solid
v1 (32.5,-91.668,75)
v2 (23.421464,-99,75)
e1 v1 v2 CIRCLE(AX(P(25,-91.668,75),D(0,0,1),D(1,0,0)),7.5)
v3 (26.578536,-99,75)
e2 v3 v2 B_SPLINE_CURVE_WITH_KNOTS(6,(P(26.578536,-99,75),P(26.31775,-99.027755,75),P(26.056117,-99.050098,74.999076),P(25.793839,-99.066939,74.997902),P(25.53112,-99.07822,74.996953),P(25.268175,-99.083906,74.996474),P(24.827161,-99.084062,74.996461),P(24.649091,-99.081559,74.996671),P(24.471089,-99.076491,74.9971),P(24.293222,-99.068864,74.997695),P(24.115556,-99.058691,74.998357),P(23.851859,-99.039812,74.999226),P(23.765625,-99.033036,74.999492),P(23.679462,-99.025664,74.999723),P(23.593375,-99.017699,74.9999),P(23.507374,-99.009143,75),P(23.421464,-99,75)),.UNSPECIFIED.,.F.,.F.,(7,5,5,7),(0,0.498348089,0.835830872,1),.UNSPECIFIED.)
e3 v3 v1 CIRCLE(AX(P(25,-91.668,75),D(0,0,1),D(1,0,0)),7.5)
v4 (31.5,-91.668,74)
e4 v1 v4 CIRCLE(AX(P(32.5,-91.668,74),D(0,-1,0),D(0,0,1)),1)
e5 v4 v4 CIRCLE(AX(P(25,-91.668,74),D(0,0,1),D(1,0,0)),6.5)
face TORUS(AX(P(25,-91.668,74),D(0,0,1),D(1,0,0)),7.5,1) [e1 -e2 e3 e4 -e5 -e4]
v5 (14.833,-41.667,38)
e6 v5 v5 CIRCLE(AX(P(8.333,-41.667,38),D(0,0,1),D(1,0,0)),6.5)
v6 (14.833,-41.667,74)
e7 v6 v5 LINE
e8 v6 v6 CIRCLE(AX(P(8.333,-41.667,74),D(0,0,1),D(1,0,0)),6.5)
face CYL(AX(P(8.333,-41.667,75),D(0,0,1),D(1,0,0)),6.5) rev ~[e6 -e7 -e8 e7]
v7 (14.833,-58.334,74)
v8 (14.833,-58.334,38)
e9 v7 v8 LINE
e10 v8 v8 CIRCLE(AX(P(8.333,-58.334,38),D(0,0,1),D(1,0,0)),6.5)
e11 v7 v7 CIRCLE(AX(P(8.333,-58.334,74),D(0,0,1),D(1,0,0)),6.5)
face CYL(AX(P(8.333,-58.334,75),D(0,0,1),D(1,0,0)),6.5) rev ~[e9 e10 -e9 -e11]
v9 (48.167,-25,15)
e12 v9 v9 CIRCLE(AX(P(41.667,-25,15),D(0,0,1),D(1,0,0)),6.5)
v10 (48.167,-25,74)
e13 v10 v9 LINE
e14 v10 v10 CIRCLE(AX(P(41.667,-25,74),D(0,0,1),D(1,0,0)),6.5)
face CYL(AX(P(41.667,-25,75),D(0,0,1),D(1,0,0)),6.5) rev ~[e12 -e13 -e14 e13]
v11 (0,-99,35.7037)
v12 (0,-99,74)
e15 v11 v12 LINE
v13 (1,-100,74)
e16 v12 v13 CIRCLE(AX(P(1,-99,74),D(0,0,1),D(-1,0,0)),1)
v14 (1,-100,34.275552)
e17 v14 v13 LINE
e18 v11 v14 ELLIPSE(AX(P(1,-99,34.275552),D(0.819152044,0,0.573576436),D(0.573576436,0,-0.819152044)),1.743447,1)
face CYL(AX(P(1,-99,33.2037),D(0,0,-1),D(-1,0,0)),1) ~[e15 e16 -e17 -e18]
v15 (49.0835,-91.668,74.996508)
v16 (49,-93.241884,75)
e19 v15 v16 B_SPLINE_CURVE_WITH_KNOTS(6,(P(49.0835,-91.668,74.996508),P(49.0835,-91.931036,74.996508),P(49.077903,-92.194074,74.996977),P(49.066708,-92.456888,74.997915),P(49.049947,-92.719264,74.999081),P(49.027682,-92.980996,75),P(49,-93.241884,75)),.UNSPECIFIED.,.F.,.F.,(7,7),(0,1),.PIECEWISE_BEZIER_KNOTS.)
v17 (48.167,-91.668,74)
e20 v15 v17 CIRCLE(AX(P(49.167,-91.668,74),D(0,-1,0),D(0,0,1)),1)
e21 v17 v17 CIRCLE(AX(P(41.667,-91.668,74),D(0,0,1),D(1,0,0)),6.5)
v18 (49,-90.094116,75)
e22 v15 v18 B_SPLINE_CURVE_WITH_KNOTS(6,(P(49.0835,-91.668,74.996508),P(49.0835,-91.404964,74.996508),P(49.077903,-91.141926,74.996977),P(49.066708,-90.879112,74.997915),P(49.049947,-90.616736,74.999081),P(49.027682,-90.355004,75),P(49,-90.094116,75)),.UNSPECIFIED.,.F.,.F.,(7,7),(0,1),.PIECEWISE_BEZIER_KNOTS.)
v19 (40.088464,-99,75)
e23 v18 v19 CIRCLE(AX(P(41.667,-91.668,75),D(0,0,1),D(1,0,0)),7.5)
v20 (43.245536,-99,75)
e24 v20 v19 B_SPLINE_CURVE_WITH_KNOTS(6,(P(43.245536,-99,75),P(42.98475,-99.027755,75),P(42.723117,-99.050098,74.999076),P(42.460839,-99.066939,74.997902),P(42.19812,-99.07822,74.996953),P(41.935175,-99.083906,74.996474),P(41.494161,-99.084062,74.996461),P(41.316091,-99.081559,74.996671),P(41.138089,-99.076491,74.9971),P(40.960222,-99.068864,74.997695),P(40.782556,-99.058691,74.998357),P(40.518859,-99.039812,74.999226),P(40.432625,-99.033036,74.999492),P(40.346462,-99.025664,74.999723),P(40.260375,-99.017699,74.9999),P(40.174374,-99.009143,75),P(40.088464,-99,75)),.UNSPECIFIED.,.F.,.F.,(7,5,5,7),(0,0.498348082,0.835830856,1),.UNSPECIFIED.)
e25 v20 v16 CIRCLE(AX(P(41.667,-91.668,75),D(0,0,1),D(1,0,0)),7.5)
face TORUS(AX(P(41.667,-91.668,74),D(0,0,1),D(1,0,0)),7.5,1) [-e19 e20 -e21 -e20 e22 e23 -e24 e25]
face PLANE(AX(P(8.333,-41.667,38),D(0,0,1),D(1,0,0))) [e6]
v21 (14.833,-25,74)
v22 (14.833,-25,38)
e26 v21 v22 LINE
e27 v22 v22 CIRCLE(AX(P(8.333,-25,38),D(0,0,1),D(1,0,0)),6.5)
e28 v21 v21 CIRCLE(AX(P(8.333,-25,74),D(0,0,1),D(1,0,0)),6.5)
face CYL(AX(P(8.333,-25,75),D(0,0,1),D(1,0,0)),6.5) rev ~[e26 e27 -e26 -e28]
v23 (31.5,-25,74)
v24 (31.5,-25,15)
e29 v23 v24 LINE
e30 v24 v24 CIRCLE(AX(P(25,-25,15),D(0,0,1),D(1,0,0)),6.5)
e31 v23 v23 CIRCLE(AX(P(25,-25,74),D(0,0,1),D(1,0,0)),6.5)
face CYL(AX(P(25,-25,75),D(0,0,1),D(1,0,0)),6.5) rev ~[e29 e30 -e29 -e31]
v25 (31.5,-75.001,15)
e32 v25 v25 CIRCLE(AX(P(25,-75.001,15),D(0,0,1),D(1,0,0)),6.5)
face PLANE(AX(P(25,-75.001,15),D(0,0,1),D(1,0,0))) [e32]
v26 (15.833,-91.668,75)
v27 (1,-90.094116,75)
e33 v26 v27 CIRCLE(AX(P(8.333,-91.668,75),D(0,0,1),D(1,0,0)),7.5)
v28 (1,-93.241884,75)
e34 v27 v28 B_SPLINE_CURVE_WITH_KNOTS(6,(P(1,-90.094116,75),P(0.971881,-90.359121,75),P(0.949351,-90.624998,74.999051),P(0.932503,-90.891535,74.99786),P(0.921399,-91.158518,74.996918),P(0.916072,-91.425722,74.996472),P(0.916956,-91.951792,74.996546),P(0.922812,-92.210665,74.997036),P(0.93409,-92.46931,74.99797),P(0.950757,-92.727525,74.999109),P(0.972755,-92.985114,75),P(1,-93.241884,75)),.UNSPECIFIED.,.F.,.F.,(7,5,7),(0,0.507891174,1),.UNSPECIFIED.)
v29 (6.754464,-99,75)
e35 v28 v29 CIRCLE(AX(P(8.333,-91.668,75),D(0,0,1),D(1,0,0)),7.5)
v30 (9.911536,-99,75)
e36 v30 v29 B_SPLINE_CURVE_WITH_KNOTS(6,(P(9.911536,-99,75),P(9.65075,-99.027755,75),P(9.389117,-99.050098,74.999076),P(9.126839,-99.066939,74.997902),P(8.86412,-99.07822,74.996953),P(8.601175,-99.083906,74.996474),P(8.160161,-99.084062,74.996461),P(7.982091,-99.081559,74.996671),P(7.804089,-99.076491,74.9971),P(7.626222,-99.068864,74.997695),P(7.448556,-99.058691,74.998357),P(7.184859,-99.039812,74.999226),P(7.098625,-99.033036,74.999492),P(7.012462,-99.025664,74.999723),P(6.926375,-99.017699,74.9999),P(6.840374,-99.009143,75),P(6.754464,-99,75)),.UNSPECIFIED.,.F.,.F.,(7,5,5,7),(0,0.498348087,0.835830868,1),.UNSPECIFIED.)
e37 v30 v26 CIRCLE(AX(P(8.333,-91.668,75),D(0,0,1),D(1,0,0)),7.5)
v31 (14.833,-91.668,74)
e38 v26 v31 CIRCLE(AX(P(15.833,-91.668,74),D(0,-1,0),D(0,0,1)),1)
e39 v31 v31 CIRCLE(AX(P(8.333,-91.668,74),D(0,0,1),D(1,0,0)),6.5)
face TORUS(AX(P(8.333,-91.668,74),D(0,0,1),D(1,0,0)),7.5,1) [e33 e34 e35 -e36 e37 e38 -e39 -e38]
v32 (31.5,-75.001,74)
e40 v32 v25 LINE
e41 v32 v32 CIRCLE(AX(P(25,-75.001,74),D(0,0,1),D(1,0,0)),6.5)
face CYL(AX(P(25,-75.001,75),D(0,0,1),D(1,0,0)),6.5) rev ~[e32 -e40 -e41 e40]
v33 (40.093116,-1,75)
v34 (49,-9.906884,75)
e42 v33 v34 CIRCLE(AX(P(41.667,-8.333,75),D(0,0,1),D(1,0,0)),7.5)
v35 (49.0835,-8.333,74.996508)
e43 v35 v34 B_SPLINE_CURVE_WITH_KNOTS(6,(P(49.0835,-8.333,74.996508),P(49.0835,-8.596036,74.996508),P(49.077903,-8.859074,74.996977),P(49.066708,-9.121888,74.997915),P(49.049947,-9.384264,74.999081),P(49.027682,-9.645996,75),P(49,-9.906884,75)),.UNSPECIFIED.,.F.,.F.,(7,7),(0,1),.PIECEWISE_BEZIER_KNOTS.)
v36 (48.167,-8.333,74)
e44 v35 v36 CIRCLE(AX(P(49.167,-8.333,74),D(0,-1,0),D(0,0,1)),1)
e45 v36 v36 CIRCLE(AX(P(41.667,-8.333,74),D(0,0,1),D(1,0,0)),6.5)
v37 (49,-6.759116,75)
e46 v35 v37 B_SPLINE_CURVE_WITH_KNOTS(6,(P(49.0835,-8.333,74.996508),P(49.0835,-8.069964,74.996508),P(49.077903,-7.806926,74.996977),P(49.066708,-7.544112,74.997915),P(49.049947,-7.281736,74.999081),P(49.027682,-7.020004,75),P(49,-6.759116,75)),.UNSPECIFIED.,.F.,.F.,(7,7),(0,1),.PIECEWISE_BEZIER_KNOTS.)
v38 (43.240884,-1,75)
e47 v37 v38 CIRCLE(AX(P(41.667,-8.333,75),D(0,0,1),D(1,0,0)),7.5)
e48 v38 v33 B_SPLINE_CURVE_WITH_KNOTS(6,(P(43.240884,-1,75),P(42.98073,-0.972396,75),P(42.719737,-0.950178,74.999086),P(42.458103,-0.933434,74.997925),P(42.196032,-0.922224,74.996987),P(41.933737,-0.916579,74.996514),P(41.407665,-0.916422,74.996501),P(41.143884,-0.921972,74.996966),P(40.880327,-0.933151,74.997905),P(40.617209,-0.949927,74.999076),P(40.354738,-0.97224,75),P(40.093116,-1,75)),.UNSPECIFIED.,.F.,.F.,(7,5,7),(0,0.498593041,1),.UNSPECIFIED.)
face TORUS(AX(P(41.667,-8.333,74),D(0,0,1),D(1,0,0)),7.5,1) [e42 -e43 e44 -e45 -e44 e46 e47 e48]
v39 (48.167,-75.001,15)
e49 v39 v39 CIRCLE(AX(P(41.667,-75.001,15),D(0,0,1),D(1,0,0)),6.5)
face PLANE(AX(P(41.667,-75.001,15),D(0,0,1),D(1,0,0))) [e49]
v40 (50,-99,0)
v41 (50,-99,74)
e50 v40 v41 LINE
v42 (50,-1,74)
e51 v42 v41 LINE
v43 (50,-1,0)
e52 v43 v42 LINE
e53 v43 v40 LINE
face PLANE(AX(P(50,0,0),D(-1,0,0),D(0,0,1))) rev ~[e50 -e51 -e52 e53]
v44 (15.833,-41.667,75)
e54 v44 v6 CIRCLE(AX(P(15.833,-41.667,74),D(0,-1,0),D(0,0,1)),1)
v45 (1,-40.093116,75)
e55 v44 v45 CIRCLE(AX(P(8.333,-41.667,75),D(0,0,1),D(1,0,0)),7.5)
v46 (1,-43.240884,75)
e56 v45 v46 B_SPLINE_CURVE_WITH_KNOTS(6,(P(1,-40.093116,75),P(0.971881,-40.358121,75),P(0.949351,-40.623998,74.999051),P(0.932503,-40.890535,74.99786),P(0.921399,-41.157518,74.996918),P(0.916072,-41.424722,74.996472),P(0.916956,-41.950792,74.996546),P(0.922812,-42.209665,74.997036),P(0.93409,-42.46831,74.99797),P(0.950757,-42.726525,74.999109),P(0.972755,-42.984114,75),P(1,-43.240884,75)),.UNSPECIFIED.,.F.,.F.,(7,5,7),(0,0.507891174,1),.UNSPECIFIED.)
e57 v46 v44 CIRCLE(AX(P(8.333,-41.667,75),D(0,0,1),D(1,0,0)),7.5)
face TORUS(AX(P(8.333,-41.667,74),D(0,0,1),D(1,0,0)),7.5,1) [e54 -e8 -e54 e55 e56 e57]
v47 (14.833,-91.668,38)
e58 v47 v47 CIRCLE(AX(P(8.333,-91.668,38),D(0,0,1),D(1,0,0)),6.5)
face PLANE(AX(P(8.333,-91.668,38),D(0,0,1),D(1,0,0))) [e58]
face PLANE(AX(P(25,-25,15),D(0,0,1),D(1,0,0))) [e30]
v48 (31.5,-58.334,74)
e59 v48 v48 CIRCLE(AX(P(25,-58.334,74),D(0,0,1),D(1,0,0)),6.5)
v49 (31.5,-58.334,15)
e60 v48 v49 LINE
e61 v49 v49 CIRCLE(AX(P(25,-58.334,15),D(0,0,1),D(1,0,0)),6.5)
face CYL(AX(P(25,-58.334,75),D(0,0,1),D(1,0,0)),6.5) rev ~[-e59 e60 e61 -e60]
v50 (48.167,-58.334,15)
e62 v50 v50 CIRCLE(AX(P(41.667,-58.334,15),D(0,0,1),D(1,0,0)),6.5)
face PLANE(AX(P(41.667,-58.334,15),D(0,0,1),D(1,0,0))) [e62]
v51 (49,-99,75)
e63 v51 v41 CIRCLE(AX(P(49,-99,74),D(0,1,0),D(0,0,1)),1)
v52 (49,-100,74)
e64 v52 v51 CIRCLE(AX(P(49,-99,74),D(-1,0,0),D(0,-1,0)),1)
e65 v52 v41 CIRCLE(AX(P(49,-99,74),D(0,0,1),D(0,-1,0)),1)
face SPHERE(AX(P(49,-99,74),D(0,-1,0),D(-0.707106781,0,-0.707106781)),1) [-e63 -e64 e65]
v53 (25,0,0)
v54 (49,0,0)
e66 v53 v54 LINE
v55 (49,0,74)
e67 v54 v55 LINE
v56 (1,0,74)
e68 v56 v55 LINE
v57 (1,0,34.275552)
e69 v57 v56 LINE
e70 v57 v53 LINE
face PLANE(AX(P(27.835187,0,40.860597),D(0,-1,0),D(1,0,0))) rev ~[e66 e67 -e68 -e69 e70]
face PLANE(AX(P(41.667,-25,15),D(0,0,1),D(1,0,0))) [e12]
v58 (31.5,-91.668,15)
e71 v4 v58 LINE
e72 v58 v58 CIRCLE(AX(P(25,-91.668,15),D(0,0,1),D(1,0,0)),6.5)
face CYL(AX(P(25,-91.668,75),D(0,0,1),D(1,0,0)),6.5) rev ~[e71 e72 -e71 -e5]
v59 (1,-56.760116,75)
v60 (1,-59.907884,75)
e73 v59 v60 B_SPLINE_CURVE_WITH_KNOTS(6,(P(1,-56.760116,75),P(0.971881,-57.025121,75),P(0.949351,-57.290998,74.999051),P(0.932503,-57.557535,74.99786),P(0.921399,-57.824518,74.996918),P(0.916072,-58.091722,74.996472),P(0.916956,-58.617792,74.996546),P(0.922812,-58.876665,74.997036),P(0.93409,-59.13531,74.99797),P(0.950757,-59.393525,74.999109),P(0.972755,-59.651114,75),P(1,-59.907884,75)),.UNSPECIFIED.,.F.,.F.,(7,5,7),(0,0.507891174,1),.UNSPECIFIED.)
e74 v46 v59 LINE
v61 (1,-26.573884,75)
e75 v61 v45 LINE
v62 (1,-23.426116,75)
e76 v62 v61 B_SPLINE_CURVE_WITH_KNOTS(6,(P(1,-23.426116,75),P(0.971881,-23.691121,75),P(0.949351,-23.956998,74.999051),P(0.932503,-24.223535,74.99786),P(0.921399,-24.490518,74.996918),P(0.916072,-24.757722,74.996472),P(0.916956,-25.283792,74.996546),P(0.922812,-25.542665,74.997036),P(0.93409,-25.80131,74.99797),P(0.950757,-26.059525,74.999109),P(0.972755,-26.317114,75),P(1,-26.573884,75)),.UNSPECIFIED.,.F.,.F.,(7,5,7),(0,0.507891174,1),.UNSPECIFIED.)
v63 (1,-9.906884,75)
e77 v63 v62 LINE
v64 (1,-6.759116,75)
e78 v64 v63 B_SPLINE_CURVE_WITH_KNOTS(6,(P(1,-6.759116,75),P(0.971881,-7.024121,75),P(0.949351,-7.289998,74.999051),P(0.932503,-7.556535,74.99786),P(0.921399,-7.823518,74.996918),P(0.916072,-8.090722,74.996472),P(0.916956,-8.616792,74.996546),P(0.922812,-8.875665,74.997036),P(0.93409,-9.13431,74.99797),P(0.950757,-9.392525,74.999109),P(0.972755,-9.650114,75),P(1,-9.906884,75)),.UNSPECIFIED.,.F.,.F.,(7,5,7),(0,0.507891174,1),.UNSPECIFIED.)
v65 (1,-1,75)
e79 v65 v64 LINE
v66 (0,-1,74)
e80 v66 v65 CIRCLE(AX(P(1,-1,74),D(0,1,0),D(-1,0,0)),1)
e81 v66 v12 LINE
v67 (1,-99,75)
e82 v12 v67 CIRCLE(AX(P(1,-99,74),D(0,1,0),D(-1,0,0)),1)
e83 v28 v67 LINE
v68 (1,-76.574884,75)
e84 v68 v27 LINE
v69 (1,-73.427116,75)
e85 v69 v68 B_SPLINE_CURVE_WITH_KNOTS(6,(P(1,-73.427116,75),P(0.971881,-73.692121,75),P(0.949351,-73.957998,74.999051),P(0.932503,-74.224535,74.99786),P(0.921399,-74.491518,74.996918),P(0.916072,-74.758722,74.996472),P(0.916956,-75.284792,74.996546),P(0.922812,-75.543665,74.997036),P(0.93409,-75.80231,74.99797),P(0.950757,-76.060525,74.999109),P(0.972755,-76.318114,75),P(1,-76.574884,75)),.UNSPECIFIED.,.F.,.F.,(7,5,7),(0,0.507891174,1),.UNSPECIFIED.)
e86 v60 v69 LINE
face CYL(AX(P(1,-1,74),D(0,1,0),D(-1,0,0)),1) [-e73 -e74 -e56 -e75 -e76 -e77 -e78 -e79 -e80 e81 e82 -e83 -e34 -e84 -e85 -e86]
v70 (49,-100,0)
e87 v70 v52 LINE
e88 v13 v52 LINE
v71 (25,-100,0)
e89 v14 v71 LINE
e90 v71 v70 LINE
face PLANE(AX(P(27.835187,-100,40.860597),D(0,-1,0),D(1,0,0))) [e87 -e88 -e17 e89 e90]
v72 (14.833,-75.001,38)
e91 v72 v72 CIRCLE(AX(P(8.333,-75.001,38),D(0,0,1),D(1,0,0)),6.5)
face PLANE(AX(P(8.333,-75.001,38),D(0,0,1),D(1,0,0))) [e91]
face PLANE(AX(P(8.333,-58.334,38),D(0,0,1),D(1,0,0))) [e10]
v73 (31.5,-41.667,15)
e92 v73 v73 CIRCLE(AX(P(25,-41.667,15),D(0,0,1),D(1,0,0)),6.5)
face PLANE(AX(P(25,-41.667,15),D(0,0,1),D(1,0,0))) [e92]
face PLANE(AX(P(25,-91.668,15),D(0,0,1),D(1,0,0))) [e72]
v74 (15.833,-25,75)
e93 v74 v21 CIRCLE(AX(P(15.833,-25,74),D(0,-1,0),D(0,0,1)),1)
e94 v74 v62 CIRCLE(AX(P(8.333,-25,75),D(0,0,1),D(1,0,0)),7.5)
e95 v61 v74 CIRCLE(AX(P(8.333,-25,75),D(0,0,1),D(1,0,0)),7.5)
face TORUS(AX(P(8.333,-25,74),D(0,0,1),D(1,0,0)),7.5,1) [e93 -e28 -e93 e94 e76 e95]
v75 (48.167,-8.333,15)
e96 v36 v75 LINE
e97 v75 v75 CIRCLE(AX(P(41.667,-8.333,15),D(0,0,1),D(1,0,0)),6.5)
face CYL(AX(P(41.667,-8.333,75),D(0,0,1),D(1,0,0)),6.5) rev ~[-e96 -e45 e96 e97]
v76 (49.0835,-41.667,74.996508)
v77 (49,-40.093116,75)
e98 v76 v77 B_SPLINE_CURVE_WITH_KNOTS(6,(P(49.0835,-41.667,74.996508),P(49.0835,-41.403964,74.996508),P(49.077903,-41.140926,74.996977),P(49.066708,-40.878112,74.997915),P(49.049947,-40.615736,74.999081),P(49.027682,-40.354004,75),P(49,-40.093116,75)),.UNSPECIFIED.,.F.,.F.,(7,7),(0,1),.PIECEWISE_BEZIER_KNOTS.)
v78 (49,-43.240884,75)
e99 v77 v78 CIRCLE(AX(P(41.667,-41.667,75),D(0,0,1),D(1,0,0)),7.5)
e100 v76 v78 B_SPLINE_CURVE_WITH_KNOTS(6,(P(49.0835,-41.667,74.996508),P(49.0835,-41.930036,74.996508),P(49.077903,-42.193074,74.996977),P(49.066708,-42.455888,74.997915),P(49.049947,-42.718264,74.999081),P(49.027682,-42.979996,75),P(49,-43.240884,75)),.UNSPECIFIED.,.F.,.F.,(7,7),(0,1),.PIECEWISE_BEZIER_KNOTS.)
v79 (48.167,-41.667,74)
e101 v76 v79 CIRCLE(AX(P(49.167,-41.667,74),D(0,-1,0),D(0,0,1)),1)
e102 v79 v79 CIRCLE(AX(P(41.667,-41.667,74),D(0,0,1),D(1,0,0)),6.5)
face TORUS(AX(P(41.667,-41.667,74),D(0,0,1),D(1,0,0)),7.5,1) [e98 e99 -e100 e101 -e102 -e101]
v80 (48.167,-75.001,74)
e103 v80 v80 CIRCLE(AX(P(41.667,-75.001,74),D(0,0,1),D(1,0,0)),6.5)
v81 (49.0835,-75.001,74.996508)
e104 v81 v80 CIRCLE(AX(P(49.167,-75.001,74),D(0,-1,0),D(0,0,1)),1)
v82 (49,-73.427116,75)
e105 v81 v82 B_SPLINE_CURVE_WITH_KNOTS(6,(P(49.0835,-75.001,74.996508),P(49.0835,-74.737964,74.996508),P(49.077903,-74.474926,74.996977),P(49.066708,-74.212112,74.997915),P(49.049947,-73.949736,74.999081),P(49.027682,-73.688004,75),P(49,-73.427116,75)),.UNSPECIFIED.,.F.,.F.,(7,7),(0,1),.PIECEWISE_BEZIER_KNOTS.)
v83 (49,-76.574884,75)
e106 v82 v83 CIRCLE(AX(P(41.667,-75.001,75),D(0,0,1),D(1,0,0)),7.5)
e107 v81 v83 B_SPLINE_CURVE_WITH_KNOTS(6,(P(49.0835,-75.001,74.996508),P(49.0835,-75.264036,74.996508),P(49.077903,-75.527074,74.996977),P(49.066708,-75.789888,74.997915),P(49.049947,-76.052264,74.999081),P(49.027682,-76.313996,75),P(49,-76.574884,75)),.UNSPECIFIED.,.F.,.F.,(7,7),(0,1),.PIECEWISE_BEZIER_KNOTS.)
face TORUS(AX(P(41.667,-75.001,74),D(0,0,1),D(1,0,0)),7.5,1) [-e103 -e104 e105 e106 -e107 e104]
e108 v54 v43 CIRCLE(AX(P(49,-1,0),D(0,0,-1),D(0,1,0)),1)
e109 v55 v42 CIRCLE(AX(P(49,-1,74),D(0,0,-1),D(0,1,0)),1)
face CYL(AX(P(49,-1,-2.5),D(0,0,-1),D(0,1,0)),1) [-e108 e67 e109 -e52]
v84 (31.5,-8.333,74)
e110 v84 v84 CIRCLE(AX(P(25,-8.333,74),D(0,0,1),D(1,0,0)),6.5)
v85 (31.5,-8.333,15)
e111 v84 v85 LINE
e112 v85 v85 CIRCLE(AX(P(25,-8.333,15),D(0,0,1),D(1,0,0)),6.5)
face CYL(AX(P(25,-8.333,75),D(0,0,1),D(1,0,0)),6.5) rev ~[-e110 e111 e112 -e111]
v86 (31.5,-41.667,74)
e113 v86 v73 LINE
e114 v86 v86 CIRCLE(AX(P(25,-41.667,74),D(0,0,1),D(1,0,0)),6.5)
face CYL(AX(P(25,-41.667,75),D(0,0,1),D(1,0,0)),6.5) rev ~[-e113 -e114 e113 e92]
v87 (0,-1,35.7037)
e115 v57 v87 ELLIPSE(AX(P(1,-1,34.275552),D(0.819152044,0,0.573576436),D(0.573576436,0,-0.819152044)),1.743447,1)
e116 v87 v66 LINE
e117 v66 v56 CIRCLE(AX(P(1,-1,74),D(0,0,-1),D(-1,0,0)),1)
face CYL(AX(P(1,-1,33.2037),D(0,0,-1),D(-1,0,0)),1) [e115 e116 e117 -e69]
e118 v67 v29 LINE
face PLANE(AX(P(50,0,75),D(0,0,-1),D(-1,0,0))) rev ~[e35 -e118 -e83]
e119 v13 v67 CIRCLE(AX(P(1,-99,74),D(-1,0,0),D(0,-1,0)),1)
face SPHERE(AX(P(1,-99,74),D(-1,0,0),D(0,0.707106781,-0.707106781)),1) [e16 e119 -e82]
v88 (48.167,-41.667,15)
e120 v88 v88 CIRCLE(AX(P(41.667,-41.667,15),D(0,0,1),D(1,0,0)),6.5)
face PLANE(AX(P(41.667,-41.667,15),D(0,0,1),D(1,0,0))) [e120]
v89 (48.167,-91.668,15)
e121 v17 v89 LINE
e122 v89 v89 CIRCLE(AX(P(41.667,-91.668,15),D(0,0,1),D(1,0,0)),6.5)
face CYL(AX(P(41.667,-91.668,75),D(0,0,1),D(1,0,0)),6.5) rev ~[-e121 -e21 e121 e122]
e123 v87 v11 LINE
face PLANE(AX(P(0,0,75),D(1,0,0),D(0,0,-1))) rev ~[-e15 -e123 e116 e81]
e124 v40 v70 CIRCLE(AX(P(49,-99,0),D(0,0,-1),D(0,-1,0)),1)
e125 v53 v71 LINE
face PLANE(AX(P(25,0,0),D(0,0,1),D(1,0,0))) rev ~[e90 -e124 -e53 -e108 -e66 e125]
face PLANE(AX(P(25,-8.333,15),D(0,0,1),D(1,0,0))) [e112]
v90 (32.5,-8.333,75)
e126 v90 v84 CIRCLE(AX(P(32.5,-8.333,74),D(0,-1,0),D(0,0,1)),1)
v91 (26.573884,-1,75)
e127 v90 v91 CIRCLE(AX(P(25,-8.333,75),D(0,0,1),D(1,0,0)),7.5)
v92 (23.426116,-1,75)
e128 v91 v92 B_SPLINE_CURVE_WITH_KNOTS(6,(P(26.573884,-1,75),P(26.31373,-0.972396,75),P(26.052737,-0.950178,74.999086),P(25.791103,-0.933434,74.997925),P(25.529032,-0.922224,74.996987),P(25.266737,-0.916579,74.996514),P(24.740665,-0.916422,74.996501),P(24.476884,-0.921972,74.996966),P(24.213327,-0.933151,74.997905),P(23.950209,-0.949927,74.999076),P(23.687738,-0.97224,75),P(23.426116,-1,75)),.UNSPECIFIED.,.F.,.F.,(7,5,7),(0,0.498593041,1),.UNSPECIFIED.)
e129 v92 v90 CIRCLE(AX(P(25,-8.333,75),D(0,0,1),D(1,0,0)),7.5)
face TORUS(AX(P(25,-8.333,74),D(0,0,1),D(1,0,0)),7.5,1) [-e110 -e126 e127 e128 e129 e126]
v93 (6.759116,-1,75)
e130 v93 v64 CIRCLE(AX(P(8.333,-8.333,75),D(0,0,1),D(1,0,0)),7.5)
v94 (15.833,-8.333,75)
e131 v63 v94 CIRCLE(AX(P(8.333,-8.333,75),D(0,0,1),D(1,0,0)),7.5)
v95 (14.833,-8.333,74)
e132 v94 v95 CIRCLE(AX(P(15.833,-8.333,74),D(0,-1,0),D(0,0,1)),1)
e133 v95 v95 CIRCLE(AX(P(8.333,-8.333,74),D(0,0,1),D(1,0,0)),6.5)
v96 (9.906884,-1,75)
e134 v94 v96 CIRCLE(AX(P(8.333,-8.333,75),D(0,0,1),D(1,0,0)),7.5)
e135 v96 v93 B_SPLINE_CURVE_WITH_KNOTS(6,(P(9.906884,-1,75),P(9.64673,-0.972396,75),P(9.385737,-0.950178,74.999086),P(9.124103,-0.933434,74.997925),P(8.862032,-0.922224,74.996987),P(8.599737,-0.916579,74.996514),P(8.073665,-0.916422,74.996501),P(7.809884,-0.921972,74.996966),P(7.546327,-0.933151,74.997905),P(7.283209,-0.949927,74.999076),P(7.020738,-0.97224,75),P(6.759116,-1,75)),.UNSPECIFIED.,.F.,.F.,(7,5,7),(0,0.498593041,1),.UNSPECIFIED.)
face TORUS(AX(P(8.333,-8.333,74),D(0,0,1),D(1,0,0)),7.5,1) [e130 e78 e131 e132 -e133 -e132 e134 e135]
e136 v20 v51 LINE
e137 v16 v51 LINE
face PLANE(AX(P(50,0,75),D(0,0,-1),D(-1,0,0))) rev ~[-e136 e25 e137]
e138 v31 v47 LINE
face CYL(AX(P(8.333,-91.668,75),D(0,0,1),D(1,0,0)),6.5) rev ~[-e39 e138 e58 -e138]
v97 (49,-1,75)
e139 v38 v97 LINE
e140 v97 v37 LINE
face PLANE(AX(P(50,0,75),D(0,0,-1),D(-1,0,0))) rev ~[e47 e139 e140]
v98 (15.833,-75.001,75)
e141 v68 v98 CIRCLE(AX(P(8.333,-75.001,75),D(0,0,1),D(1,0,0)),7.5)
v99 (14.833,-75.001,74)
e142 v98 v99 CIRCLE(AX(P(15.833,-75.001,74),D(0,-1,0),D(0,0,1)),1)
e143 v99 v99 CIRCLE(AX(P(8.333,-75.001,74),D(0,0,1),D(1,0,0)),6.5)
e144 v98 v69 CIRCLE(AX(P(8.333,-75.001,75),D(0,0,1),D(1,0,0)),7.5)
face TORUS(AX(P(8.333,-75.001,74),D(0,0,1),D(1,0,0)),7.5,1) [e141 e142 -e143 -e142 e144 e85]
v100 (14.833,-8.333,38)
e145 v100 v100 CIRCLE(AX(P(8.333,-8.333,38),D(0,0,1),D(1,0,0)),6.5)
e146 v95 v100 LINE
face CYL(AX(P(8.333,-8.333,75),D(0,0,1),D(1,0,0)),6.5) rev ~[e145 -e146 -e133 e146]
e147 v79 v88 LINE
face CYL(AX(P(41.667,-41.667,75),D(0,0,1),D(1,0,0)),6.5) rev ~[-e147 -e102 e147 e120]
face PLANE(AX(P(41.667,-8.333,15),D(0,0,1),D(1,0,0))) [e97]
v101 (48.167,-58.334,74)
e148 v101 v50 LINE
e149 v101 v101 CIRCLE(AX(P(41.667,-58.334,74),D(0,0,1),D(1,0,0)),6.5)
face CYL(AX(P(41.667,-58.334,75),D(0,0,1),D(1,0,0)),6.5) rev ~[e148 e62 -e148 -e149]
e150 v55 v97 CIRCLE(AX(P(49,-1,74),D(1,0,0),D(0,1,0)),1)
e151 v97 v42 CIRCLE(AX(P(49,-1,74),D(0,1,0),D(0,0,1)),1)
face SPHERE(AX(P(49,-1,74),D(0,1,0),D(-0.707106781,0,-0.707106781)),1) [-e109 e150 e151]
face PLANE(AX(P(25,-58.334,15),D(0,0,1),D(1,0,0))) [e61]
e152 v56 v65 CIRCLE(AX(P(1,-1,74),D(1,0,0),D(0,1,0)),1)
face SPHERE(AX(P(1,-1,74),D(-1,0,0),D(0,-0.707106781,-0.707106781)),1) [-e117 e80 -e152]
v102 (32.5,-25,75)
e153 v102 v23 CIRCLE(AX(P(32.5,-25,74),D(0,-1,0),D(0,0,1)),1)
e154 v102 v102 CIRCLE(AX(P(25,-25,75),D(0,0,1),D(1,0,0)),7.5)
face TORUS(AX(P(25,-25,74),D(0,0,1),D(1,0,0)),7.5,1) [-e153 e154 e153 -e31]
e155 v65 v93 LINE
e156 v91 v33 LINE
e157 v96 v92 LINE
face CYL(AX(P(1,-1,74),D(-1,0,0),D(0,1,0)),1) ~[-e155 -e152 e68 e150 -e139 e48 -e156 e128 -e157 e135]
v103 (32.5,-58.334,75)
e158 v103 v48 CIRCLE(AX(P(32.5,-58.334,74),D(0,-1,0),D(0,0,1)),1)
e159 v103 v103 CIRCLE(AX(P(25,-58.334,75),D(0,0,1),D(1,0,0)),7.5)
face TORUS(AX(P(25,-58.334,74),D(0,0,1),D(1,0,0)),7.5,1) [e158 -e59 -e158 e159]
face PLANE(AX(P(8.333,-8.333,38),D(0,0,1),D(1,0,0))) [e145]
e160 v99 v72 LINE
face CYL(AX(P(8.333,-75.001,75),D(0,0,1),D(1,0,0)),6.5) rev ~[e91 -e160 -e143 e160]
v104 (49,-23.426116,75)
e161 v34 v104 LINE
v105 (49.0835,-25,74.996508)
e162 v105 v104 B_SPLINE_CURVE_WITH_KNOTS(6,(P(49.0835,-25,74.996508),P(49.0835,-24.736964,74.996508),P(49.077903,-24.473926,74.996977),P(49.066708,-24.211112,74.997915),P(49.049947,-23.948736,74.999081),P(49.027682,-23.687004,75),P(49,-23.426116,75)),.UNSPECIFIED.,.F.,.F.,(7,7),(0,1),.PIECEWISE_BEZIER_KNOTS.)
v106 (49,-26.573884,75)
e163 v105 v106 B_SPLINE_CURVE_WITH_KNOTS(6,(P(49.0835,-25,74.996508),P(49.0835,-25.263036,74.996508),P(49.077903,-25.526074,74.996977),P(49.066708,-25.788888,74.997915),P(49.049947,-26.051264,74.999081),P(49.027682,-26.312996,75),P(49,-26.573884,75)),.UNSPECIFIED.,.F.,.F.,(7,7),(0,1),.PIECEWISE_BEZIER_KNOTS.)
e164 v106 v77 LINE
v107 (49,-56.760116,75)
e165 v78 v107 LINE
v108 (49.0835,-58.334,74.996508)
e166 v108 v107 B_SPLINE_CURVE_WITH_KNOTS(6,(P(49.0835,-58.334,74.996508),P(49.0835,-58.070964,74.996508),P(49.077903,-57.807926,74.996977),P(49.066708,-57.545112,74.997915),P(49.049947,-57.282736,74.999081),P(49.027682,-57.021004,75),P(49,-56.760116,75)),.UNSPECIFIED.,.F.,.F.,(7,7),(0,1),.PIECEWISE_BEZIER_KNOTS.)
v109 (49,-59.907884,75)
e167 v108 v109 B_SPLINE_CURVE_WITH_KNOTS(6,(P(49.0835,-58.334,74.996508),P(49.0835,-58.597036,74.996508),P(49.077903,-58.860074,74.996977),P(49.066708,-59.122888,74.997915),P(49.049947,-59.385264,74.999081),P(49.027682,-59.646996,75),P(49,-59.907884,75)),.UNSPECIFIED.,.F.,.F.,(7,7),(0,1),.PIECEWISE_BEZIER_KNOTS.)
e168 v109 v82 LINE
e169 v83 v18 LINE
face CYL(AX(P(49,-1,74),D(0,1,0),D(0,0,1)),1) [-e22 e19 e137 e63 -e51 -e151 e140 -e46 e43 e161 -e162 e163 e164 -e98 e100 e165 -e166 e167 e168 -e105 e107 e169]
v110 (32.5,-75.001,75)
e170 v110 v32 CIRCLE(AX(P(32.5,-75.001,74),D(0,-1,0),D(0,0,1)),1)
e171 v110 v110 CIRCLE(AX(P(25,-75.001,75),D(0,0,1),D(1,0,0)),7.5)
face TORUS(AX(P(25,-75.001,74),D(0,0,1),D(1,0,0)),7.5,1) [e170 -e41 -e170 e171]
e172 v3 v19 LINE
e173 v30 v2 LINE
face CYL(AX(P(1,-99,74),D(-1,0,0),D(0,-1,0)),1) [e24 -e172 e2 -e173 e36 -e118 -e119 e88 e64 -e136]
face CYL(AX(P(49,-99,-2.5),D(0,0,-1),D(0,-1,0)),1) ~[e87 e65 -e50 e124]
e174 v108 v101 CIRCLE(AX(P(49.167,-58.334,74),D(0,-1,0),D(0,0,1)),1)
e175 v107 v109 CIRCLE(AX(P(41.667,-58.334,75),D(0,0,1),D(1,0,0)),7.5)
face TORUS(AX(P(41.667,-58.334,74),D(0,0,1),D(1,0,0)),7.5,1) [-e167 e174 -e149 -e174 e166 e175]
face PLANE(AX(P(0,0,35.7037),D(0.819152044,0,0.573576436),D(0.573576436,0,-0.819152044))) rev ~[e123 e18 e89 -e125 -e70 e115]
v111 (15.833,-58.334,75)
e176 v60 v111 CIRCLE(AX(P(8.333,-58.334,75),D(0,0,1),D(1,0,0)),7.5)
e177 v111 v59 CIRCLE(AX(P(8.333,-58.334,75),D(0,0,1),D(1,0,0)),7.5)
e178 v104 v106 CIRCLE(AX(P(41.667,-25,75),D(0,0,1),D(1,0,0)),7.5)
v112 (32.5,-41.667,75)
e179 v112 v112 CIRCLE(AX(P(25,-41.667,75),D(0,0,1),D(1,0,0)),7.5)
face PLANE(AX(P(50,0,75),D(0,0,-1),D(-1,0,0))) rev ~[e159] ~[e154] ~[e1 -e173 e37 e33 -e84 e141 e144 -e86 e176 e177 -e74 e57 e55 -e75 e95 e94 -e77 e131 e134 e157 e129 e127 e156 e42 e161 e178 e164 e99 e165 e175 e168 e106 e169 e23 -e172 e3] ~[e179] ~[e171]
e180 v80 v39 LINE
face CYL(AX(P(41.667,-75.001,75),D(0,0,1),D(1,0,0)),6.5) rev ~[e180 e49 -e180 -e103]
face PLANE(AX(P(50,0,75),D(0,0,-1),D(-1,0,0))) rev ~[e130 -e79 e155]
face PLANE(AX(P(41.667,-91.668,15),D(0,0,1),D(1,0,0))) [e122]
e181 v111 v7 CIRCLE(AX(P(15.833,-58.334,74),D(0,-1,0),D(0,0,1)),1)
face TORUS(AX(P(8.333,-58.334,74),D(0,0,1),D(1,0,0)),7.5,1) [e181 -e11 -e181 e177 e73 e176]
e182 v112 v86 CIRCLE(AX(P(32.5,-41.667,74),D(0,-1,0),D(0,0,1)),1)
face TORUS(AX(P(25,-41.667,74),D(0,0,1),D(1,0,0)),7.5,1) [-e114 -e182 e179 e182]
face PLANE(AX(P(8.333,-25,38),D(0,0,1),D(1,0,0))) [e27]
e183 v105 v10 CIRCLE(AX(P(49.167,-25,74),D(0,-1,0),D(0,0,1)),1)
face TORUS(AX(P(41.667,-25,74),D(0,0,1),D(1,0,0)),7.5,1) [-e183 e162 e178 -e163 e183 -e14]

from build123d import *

# Parameters (mm, degrees)
F1_DEPTH     = 100
F2_R         = 6.5
F3_DEPTH     = 60
F4_R         = 6.5
F5_DEPTH     = 60
F6_R         = 6.5
F7_DEPTH     = 37
F8_T1_DEPTH  = 98
F8_T3_DEPTH  = 48
F8_T5_DEPTH  = 76.5
F8_T7_DEPTH  = 40.7962998314
F8_S11_W     = 1
F8_S11_H     = 1
F8_T12_DEPTH = 1
F8_S17_W     = 1
F8_S17_H     = 1
F8_T18_DEPTH = 1
F8_S23_W     = 1
F8_S23_H     = 1
F8_T24_DEPTH = 1
F8_S29_W     = 1
F8_S29_H     = 1
F8_T30_DEPTH = 1


# Not quite as in the source:
# - a fillet or chamfer that OpenCascade refuses, or shapes differently, is made with other operations: its cross-section is extruded or revolved along the edge and cut away or added


with BuildPart() as f1:
    # F0 (on Front) → F1 (new body)
    with BuildSketch(Plane.XZ):
        Polygon((0, 35.7037001686), (25, 0), (50, 0), (50, 75), (0, 75), align=None)
    extrude(amount=F1_DEPTH)

    # F2 (on face) → F3 (cut)
    with BuildSketch(Plane.XY.offset(75)):
        with Locations((41.667, -8.333)):
            Circle(F2_R)
        with Locations((41.667, -25)):
            Circle(F2_R)
        with Locations((41.667, -41.667)):
            Circle(F2_R)
        with Locations((41.667, -58.334)):
            Circle(F2_R)
        with Locations((41.667, -75.001)):
            Circle(F2_R)
        with Locations((41.667, -91.668)):
            Circle(F2_R)
    extrude(amount=-F3_DEPTH, mode=Mode.SUBTRACT)

    # F4 (on face) → F5 (cut)
    with BuildSketch(Plane.XY.offset(75)):
        with Locations((25, -8.333)):
            Circle(F4_R)
        with Locations((25, -25)):
            Circle(F4_R)
        with Locations((25, -41.667)):
            Circle(F4_R)
        with Locations((25, -58.334)):
            Circle(F4_R)
        with Locations((25, -75.001)):
            Circle(F4_R)
        with Locations((25, -91.668)):
            Circle(F4_R)
    extrude(amount=-F5_DEPTH, mode=Mode.SUBTRACT)

    # F6 (on face) → F7 (cut)
    with BuildSketch(Plane.XY.offset(75)):
        with Locations((8.333, -8.333)):
            Circle(F6_R)
        with Locations((8.333, -25)):
            Circle(F6_R)
        with Locations((8.333, -41.667)):
            Circle(F6_R)
        with Locations((8.333, -58.334)):
            Circle(F6_R)
        with Locations((8.333, -75.001)):
            Circle(F6_R)
        with Locations((8.333, -91.668)):
            Circle(F6_R)
    extrude(amount=-F7_DEPTH, mode=Mode.SUBTRACT)

    # F8: fillet of radius 1 on 26 edges, made by hand

    # F8_s2 → F8_t1 (cut)
    with BuildSketch(Plane.XZ.offset(1)):
        with BuildLine():
            ThreePointArc((49, 75), (49.7071067812, 74.7071067812), (50, 74))
            Line((50, 74), (50, 75))
            Line((50, 75), (49, 75))
        make_face()
        with BuildLine():
            ThreePointArc((0, 74), (0.2928932188, 74.7071067812), (1, 75))
            Line((1, 75), (0, 75))
            Line((0, 75), (0, 74))
        make_face()
    extrude(amount=F8_T1_DEPTH, mode=Mode.SUBTRACT)

    # F8_s4 → F8_t3 (cut)
    with BuildSketch(Plane.YZ.offset(1)):
        with BuildLine():
            ThreePointArc((0, 74), (-0.2928932188, 74.7071067812), (-1, 75))
            Line((-1, 75), (0, 75))
            Line((0, 75), (0, 74))
        make_face()
        with BuildLine():
            ThreePointArc((-100, 74), (-99.7071067812, 74.7071067812), (-99, 75))
            Line((-99, 75), (-100, 75))
            Line((-100, 75), (-100, 74))
        make_face()
    extrude(amount=F8_T3_DEPTH, mode=Mode.SUBTRACT)

    # F8_s6 → F8_t5 (cut)
    with BuildSketch(Plane.XY.offset(-2.5)):
        with BuildLine():
            ThreePointArc((49, -100), (49.7071067812, -99.7071067812), (50, -99))
            Line((50, -99), (50, -100))
            Line((50, -100), (49, -100))
        make_face()
        with BuildLine():
            ThreePointArc((49, 0), (49.7071067812, -0.2928932188), (50, -1))
            Line((50, -1), (50, 0))
            Line((50, 0), (49, 0))
        make_face()
    extrude(amount=F8_T5_DEPTH, mode=Mode.SUBTRACT)

    # F8_s8 → F8_t7 (cut)
    with BuildSketch(Plane.XY.offset(33.2037001686)):
        with BuildLine():
            ThreePointArc((0, -99), (0.2928932188, -99.7071067812), (1, -100))
            Line((1, -100), (0, -100))
            Line((0, -100), (0, -99))
        make_face()
        with BuildLine():
            ThreePointArc((0, -1), (0.2928932188, -0.2928932188), (1, 0))
            Line((1, 0), (0, 0))
            Line((0, 0), (0, -1))
        make_face()
    extrude(amount=F8_T7_DEPTH, mode=Mode.SUBTRACT)


with BuildPart() as f8_tool10:
    # F8_s11 → F8_t12 (new body)
    with BuildSketch(Plane.XZ.offset(1)):
        with Locations((49.5, 74.5)):
            Rectangle(F8_S11_W, F8_S11_H)
    extrude(amount=-F8_T12_DEPTH)

    # F8_s13 → F8_t14 (revolve, cut)
    with BuildSketch(Plane(origin=(49, -1, 74), x_dir=(-0.7071067812, 0, -0.7071067812), z_dir=(0.7071067812, 0, -0.7071067812))):
        with BuildLine():
            ThreePointArc((0, -1), (1, 0), (0, 1))
            Line((0, 1), (0, -1))
        make_face()
    revolve(axis=Axis((49, -1, 74), (0, 1, 0)), mode=Mode.SUBTRACT)


with BuildPart() as f1_1:
    add(f1.part)

    # F8_t9: cut F8_tool10
    add(f8_tool10.part, mode=Mode.SUBTRACT)


with BuildPart() as f8_tool16:
    # F8_s17 → F8_t18 (new body)
    with BuildSketch(Plane.XZ.offset(99)):
        with Locations((49.5, 74.5)):
            Rectangle(F8_S17_W, F8_S17_H)
    extrude(amount=F8_T18_DEPTH)

    # F8_s19 → F8_t20 (revolve, cut)
    with BuildSketch(Plane(origin=(49, -99, 74), x_dir=(-0.7071067812, 0, -0.7071067812), z_dir=(-0.7071067812, 0, 0.7071067812))):
        with BuildLine():
            ThreePointArc((0, -1), (1, 0), (0, 1))
            Line((0, 1), (0, -1))
        make_face()
    revolve(axis=Axis((49, -99, 74), (0, -1, 0)), mode=Mode.SUBTRACT)


with BuildPart() as f1_2:
    add(f1_1.part)

    # F8_t15: cut F8_tool16
    add(f8_tool16.part, mode=Mode.SUBTRACT)


with BuildPart() as f8_tool22:
    # F8_s23 → F8_t24 (new body)
    with BuildSketch(Plane.YZ.offset(1)):
        with Locations((-0.5, 74.5)):
            Rectangle(F8_S23_W, F8_S23_H)
    extrude(amount=-F8_T24_DEPTH)

    # F8_s25 → F8_t26 (revolve, cut)
    with BuildSketch(Plane(origin=(1, -1, 74), x_dir=(0, -0.7071067812, -0.7071067812), z_dir=(0, 0.7071067812, -0.7071067812))):
        with BuildLine():
            ThreePointArc((0, -1), (1, 0), (0, 1))
            Line((0, 1), (0, -1))
        make_face()
    revolve(axis=Axis((1, -1, 74), (-1, 0, 0)), mode=Mode.SUBTRACT)


with BuildPart() as f1_3:
    add(f1_2.part)

    # F8_t21: cut F8_tool22
    add(f8_tool22.part, mode=Mode.SUBTRACT)


with BuildPart() as f8_tool28:
    # F8_s29 → F8_t30 (new body)
    with BuildSketch(Plane.YZ.offset(1)):
        with Locations((-99.5, 74.5)):
            Rectangle(F8_S29_W, F8_S29_H)
    extrude(amount=-F8_T30_DEPTH)

    # F8_s31 → F8_t32 (revolve, cut)
    with BuildSketch(Plane(origin=(1, -99, 74), x_dir=(0, 0.7071067812, -0.7071067812), z_dir=(0, 0.7071067812, 0.7071067812))):
        with BuildLine():
            ThreePointArc((0, -1), (1, 0), (0, 1))
            Line((0, 1), (0, -1))
        make_face()
    revolve(axis=Axis((1, -99, 74), (-1, 0, 0)), mode=Mode.SUBTRACT)


with BuildPart() as f1_4:
    add(f1_3.part)

    # F8_t27: cut F8_tool28
    add(f8_tool28.part, mode=Mode.SUBTRACT)

    # F8_s33 → F8_t34 (revolve, cut)
    with BuildSketch(Plane.XZ.offset(91.668)):
        with BuildLine():
            ThreePointArc((49.167, 75), (48.4598932188, 74.7071067812), (48.167, 74))
            Line((48.167, 74), (48.167, 75))
            Line((48.167, 75), (49.167, 75))
        make_face()
    revolve(axis=Axis((41.667, -91.668, 75), (0, 0, 1)), mode=Mode.SUBTRACT)

    # F8_s35 → F8_t36 (revolve, cut)
    with BuildSketch(Plane.XZ.offset(75.001)):
        with BuildLine():
            ThreePointArc((49.167, 75), (48.4598932188, 74.7071067812), (48.167, 74))
            Line((48.167, 74), (48.167, 75))
            Line((48.167, 75), (49.167, 75))
        make_face()
    revolve(axis=Axis((41.667, -75.001, 75), (0, 0, 1)), mode=Mode.SUBTRACT)

    # F8_s37 → F8_t38 (revolve, cut)
    with BuildSketch(Plane.XZ.offset(58.334)):
        with BuildLine():
            ThreePointArc((49.167, 75), (48.4598932188, 74.7071067812), (48.167, 74))
            Line((48.167, 74), (48.167, 75))
            Line((48.167, 75), (49.167, 75))
        make_face()
    revolve(axis=Axis((41.667, -58.334, 75), (0, 0, 1)), mode=Mode.SUBTRACT)

    # F8_s39 → F8_t40 (revolve, cut)
    with BuildSketch(Plane.XZ.offset(91.668)):
        with BuildLine():
            ThreePointArc((32.5, 75), (31.7928932188, 74.7071067812), (31.5, 74))
            Line((31.5, 74), (31.5, 75))
            Line((31.5, 75), (32.5, 75))
        make_face()
    revolve(axis=Axis((25, -91.668, 75), (0, 0, 1)), mode=Mode.SUBTRACT)

    # F8_s41 → F8_t42 (revolve, cut)
    with BuildSketch(Plane.XZ.offset(75.001)):
        with BuildLine():
            ThreePointArc((32.5, 75), (31.7928932188, 74.7071067812), (31.5, 74))
            Line((31.5, 74), (31.5, 75))
            Line((31.5, 75), (32.5, 75))
        make_face()
    revolve(axis=Axis((25, -75.001, 75), (0, 0, 1)), mode=Mode.SUBTRACT)

    # F8_s43 → F8_t44 (revolve, cut)
    with BuildSketch(Plane.XZ.offset(91.668)):
        with BuildLine():
            ThreePointArc((15.833, 75), (15.1258932188, 74.7071067812), (14.833, 74))
            Line((14.833, 74), (14.833, 75))
            Line((14.833, 75), (15.833, 75))
        make_face()
    revolve(axis=Axis((8.333, -91.668, 75), (0, 0, 1)), mode=Mode.SUBTRACT)

    # F8_s45 → F8_t46 (revolve, cut)
    with BuildSketch(Plane.XZ.offset(75.001)):
        with BuildLine():
            ThreePointArc((15.833, 75), (15.1258932188, 74.7071067812), (14.833, 74))
            Line((14.833, 74), (14.833, 75))
            Line((14.833, 75), (15.833, 75))
        make_face()
    revolve(axis=Axis((8.333, -75.001, 75), (0, 0, 1)), mode=Mode.SUBTRACT)

    # F8_s47 → F8_t48 (revolve, cut)
    with BuildSketch(Plane.XZ.offset(58.334)):
        with BuildLine():
            ThreePointArc((32.5, 75), (31.7928932188, 74.7071067812), (31.5, 74))
            Line((31.5, 74), (31.5, 75))
            Line((31.5, 75), (32.5, 75))
        make_face()
    revolve(axis=Axis((25, -58.334, 75), (0, 0, 1)), mode=Mode.SUBTRACT)

    # F8_s49 → F8_t50 (revolve, cut)
    with BuildSketch(Plane.XZ.offset(58.334)):
        with BuildLine():
            ThreePointArc((15.833, 75), (15.1258932188, 74.7071067812), (14.833, 74))
            Line((14.833, 74), (14.833, 75))
            Line((14.833, 75), (15.833, 75))
        make_face()
    revolve(axis=Axis((8.333, -58.334, 75), (0, 0, 1)), mode=Mode.SUBTRACT)

    # F8_s51 → F8_t52 (revolve, cut)
    with BuildSketch(Plane.XZ.offset(41.667)):
        with BuildLine():
            ThreePointArc((49.167, 75), (48.4598932188, 74.7071067812), (48.167, 74))
            Line((48.167, 74), (48.167, 75))
            Line((48.167, 75), (49.167, 75))
        make_face()
    revolve(axis=Axis((41.667, -41.667, 75), (0, 0, 1)), mode=Mode.SUBTRACT)

    # F8_s53 → F8_t54 (revolve, cut)
    with BuildSketch(Plane.XZ.offset(25)):
        with BuildLine():
            ThreePointArc((49.167, 75), (48.4598932188, 74.7071067812), (48.167, 74))
            Line((48.167, 74), (48.167, 75))
            Line((48.167, 75), (49.167, 75))
        make_face()
    revolve(axis=Axis((41.667, -25, 75), (0, 0, 1)), mode=Mode.SUBTRACT)

    # F8_s55 → F8_t56 (revolve, cut)
    with BuildSketch(Plane.XZ.offset(8.333)):
        with BuildLine():
            ThreePointArc((49.167, 75), (48.4598932188, 74.7071067812), (48.167, 74))
            Line((48.167, 74), (48.167, 75))
            Line((48.167, 75), (49.167, 75))
        make_face()
    revolve(axis=Axis((41.667, -8.333, 75), (0, 0, 1)), mode=Mode.SUBTRACT)

    # F8_s57 → F8_t58 (revolve, cut)
    with BuildSketch(Plane.XZ.offset(41.667)):
        with BuildLine():
            ThreePointArc((32.5, 75), (31.7928932188, 74.7071067812), (31.5, 74))
            Line((31.5, 74), (31.5, 75))
            Line((31.5, 75), (32.5, 75))
        make_face()
    revolve(axis=Axis((25, -41.667, 75), (0, 0, 1)), mode=Mode.SUBTRACT)

    # F8_s59 → F8_t60 (revolve, cut)
    with BuildSketch(Plane.XZ.offset(41.667)):
        with BuildLine():
            ThreePointArc((15.833, 75), (15.1258932188, 74.7071067812), (14.833, 74))
            Line((14.833, 74), (14.833, 75))
            Line((14.833, 75), (15.833, 75))
        make_face()
    revolve(axis=Axis((8.333, -41.667, 75), (0, 0, 1)), mode=Mode.SUBTRACT)

    # F8_s61 → F8_t62 (revolve, cut)
    with BuildSketch(Plane.XZ.offset(25)):
        with BuildLine():
            ThreePointArc((32.5, 75), (31.7928932188, 74.7071067812), (31.5, 74))
            Line((31.5, 74), (31.5, 75))
            Line((31.5, 75), (32.5, 75))
        make_face()
    revolve(axis=Axis((25, -25, 75), (0, 0, 1)), mode=Mode.SUBTRACT)

    # F8_s63 → F8_t64 (revolve, cut)
    with BuildSketch(Plane.XZ.offset(8.333)):
        with BuildLine():
            ThreePointArc((32.5, 75), (31.7928932188, 74.7071067812), (31.5, 74))
            Line((31.5, 74), (31.5, 75))
            Line((31.5, 75), (32.5, 75))
        make_face()
    revolve(axis=Axis((25, -8.333, 75), (0, 0, 1)), mode=Mode.SUBTRACT)

    # F8_s65 → F8_t66 (revolve, cut)
    with BuildSketch(Plane.XZ.offset(25)):
        with BuildLine():
            ThreePointArc((15.833, 75), (15.1258932188, 74.7071067812), (14.833, 74))
            Line((14.833, 74), (14.833, 75))
            Line((14.833, 75), (15.833, 75))
        make_face()
    revolve(axis=Axis((8.333, -25, 75), (0, 0, 1)), mode=Mode.SUBTRACT)

    # F8_s67 → F8_t68 (revolve, cut)
    with BuildSketch(Plane.XZ.offset(8.333)):
        with BuildLine():
            ThreePointArc((15.833, 75), (15.1258932188, 74.7071067812), (14.833, 74))
            Line((14.833, 74), (14.833, 75))
            Line((14.833, 75), (15.833, 75))
        make_face()
    revolve(axis=Axis((8.333, -8.333, 75), (0, 0, 1)), mode=Mode.SUBTRACT)


solid = f1_4.part
